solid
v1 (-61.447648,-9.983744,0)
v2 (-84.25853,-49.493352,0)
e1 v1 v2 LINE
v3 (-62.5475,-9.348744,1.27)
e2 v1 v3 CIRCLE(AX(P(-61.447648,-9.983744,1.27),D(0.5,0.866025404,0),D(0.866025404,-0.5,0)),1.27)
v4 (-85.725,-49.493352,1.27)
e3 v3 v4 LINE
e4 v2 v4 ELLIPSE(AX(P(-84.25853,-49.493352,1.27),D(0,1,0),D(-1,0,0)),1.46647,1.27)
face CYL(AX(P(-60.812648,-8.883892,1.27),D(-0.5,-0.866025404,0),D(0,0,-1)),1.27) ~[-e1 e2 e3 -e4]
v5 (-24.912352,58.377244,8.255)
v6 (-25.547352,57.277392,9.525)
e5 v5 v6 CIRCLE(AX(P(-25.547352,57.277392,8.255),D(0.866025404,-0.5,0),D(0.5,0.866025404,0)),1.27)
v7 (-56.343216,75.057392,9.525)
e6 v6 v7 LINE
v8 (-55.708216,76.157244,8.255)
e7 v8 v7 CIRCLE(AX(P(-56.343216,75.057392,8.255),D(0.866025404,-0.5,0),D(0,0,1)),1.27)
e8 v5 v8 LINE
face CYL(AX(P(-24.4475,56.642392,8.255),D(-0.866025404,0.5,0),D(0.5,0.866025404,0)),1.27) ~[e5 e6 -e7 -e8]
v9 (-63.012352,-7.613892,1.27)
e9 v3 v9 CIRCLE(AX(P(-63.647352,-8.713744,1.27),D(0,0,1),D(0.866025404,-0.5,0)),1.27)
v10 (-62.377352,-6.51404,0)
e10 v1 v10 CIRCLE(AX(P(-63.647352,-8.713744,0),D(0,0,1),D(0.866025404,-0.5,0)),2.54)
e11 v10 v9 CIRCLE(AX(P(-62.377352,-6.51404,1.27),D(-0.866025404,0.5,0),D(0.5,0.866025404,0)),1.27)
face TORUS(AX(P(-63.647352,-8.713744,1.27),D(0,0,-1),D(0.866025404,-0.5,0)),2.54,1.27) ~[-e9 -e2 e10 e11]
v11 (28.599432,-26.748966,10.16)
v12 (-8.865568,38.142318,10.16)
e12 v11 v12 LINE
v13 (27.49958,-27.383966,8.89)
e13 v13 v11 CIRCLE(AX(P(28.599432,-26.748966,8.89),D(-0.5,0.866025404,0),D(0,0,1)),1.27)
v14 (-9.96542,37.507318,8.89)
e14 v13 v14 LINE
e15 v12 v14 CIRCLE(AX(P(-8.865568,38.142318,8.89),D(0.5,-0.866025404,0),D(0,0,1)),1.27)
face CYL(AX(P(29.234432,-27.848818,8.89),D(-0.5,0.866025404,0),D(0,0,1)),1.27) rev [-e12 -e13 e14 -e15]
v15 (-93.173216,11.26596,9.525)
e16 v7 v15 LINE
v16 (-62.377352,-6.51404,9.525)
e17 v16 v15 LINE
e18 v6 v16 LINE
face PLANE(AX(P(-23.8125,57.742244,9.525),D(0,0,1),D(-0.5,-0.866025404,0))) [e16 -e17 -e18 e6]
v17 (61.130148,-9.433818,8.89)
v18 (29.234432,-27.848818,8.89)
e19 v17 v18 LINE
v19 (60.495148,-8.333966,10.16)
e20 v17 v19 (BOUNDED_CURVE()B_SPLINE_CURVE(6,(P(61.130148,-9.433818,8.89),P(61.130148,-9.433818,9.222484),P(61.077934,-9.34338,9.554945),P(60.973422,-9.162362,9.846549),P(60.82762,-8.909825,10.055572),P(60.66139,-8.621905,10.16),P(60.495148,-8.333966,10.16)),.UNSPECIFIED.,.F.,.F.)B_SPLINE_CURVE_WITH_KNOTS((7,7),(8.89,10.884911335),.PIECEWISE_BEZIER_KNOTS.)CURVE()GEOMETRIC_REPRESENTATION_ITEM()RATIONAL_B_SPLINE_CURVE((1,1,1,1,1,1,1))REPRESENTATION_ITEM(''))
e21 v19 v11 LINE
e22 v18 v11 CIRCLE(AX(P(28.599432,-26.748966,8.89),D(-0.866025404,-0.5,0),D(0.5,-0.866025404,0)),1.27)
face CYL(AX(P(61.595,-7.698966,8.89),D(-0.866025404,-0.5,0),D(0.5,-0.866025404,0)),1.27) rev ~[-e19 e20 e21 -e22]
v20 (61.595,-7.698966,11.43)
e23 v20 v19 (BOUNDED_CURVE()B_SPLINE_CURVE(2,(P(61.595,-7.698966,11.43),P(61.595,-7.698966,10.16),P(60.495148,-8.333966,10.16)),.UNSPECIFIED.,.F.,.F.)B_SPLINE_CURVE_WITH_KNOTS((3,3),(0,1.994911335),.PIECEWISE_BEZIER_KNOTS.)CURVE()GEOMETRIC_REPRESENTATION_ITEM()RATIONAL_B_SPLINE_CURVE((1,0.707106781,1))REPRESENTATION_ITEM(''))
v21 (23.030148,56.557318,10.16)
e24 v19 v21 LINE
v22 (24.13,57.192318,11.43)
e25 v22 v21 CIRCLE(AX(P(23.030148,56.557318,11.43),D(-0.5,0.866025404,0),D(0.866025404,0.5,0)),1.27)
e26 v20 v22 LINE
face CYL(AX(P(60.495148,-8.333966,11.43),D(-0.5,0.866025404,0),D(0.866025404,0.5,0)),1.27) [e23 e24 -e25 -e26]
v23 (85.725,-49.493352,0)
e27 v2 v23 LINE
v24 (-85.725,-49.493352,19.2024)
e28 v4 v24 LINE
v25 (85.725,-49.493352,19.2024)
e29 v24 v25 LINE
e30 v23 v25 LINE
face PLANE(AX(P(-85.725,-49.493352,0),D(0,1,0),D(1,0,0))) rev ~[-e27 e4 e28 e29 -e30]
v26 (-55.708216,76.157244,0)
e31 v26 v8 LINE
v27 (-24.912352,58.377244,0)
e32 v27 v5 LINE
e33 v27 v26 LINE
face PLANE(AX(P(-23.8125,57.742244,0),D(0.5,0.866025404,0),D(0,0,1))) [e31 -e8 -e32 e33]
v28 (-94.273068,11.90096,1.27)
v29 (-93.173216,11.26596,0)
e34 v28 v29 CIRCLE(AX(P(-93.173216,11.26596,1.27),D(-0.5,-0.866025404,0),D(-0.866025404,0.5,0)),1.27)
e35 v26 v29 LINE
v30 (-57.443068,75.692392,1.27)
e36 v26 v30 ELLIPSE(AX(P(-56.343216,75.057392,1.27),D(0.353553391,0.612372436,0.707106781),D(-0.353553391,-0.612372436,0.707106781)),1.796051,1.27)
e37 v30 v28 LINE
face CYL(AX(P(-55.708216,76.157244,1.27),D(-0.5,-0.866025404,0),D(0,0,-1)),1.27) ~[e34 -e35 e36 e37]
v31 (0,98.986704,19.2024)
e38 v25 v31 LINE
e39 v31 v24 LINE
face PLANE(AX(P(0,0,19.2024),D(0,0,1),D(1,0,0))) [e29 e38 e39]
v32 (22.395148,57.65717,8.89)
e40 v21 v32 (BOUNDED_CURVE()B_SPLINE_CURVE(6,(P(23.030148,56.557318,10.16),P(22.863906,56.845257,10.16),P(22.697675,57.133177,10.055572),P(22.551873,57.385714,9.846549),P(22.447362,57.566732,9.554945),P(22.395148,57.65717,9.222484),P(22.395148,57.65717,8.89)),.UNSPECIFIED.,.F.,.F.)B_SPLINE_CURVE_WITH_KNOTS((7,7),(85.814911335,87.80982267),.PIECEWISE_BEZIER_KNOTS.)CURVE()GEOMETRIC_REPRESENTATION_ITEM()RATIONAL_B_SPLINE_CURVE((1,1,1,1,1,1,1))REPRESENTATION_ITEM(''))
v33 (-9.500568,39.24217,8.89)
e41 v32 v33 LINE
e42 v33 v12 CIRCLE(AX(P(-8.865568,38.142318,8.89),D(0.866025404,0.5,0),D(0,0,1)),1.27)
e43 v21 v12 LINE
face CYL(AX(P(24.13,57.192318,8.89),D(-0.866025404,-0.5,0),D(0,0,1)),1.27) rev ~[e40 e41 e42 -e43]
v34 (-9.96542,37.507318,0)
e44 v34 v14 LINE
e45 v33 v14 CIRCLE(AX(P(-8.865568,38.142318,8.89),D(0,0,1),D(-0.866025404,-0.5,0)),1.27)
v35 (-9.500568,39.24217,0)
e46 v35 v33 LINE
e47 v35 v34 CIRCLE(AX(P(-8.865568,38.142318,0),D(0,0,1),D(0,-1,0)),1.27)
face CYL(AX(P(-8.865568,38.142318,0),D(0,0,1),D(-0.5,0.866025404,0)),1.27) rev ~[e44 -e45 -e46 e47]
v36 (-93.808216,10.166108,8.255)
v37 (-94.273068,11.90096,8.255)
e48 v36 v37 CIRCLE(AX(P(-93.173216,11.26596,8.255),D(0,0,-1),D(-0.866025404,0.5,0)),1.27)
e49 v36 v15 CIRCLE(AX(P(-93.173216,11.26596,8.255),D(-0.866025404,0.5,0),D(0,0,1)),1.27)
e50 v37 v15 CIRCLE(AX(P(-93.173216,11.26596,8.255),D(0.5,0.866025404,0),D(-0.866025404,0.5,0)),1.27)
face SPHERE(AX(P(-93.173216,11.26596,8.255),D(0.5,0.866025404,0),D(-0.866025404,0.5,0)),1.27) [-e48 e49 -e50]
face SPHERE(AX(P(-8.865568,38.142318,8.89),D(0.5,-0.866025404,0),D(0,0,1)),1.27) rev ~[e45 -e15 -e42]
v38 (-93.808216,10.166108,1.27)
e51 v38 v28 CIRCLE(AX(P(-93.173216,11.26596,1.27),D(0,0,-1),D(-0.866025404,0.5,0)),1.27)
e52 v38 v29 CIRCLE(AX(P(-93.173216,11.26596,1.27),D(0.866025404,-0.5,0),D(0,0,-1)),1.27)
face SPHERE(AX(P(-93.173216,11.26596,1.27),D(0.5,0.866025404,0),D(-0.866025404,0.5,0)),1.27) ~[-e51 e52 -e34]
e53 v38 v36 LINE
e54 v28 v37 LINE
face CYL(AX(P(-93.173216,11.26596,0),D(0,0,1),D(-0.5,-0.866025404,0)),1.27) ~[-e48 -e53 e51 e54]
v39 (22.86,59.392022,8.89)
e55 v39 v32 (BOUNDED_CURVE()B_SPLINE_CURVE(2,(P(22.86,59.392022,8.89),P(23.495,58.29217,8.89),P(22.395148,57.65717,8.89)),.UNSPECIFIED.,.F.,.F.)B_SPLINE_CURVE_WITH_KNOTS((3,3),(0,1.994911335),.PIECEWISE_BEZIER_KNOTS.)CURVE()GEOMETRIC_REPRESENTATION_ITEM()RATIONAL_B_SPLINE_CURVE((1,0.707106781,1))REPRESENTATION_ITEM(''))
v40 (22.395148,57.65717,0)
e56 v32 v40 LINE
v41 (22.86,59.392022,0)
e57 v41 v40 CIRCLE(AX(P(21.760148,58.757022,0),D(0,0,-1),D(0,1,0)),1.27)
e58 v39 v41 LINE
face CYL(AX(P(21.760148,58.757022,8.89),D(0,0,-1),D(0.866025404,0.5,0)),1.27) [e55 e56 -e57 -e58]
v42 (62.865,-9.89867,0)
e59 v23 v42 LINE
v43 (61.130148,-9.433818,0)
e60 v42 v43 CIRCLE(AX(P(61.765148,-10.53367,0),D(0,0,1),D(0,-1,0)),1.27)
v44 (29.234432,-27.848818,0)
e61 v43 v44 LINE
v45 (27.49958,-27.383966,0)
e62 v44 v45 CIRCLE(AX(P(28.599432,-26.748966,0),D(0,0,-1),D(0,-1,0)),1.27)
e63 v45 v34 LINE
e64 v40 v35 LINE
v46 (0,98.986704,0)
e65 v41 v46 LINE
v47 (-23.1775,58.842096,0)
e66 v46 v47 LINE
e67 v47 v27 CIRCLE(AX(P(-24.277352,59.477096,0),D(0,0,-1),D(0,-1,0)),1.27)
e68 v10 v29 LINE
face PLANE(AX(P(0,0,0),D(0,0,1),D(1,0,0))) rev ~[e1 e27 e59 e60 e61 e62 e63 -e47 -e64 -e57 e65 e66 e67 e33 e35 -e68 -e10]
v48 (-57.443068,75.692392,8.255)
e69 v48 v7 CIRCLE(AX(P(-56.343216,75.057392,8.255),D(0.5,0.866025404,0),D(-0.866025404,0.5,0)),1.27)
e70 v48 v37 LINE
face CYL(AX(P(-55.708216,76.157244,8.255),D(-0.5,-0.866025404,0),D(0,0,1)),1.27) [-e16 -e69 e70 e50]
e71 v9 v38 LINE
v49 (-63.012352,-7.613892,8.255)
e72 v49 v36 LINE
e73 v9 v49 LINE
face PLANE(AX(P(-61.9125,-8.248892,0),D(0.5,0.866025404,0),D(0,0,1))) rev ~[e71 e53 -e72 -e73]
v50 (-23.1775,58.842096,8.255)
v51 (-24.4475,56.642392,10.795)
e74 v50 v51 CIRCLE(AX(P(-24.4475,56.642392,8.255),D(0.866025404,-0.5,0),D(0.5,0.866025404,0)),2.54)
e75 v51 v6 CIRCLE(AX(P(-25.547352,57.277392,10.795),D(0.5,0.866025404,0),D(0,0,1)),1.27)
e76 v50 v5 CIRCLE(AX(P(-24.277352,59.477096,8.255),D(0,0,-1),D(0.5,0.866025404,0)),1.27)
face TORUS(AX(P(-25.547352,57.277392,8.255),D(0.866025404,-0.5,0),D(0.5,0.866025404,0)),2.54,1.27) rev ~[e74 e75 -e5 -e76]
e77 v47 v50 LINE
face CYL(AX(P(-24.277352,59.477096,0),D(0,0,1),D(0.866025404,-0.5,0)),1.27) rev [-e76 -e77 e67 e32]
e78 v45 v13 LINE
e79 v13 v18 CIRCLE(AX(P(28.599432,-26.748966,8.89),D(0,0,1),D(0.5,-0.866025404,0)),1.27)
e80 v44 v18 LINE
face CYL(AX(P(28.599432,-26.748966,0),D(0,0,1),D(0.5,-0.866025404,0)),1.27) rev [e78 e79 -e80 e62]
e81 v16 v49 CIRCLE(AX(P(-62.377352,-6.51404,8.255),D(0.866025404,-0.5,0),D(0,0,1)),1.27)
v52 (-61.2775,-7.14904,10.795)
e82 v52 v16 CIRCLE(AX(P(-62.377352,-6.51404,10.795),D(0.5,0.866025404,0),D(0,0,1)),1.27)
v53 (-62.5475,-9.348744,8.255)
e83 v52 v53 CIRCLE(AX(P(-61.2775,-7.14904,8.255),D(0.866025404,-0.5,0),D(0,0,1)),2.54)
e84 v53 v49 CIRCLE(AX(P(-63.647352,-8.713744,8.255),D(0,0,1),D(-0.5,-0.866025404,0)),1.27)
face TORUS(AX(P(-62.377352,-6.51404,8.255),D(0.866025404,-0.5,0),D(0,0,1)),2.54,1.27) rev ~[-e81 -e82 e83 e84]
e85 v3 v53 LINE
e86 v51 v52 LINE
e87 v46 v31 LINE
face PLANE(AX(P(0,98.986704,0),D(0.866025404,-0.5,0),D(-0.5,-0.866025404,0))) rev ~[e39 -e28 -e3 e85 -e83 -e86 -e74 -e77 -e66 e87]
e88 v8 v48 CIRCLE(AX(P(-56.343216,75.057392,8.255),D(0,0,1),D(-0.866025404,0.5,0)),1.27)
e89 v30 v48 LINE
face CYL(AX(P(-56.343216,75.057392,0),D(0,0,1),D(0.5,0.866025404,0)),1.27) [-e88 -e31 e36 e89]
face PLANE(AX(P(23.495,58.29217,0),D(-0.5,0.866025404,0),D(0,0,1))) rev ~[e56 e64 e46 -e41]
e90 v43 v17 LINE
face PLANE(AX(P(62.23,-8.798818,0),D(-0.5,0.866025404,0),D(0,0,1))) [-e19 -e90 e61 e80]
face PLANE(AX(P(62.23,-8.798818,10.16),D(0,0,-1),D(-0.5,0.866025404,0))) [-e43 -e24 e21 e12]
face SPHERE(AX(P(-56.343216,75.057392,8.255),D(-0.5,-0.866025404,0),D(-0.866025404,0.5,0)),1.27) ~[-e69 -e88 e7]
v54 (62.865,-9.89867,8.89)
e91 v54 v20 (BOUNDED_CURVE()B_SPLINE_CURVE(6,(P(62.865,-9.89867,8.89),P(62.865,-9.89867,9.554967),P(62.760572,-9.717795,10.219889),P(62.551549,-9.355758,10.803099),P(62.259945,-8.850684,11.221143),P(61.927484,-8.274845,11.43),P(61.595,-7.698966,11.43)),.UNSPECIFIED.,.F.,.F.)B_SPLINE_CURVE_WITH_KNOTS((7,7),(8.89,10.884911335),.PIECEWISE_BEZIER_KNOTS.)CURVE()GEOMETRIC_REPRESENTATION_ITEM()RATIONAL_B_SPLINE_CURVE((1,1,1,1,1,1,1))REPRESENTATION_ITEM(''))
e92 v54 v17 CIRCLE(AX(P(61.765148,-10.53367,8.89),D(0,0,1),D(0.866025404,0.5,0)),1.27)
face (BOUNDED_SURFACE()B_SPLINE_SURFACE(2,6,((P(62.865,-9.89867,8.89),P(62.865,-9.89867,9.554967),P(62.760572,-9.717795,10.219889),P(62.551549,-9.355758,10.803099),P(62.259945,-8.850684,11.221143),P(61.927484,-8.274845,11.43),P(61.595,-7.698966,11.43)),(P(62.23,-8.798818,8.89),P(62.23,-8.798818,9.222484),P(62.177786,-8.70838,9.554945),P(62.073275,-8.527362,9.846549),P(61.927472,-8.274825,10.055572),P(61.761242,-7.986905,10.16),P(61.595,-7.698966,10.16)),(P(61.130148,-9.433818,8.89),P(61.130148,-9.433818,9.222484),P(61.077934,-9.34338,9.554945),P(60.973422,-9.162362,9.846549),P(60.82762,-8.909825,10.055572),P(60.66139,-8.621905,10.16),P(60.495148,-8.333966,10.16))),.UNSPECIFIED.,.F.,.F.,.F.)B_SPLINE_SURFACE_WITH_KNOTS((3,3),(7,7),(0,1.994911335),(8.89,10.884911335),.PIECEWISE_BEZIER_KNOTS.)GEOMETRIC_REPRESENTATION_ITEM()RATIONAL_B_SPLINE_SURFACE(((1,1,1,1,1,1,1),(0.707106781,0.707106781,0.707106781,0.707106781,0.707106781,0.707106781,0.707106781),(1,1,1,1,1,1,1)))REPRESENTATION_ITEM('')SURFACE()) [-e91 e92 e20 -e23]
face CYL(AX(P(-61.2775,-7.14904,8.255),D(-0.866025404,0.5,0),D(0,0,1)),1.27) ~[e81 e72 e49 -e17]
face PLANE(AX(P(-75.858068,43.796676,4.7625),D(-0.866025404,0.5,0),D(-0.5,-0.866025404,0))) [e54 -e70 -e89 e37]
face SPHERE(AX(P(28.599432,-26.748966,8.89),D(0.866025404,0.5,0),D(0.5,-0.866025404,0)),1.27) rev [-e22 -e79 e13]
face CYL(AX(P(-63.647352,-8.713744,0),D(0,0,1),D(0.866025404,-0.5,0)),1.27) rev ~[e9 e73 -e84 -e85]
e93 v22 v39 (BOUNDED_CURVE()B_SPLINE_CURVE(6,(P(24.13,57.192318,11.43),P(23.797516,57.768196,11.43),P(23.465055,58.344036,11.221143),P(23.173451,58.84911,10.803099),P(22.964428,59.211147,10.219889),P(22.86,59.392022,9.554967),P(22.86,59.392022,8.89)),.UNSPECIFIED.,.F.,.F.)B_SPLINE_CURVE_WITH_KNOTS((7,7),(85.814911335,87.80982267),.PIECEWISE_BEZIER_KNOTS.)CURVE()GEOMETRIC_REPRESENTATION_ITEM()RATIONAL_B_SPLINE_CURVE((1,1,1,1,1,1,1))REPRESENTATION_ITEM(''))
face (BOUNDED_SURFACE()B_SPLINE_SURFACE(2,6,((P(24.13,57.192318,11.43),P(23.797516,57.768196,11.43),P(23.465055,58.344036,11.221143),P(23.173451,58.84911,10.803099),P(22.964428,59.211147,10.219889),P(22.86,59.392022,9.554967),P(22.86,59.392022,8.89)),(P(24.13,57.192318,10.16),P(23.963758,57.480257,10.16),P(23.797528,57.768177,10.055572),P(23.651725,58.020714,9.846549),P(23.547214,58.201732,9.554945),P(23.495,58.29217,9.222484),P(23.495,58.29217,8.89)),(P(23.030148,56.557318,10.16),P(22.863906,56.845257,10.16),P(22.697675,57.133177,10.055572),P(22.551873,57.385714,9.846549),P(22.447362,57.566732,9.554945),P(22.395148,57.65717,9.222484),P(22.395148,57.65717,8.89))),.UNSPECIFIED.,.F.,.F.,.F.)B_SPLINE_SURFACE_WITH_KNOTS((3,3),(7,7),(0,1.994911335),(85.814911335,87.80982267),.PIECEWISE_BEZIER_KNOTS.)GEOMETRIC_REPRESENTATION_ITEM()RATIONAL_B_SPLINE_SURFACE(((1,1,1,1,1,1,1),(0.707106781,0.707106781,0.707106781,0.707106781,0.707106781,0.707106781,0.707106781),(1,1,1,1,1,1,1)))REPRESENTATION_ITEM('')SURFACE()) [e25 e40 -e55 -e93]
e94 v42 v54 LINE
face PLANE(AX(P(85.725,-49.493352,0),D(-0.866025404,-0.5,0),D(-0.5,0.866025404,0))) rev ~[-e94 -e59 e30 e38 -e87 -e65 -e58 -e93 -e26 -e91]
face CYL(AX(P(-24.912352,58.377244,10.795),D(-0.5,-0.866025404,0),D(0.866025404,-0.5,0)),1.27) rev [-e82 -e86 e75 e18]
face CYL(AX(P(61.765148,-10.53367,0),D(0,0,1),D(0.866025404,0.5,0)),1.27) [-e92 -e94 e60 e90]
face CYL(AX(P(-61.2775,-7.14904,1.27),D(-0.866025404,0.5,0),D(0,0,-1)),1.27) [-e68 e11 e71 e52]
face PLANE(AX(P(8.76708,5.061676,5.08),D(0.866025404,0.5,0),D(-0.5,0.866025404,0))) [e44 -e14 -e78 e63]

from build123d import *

# Parameters (mm, degrees)
F1_DEPTH = 19.2024
F2_W     = 77.47
F2_H     = 10.16
F3_DEPTH = 39.37
F4_F1_R  = 1.27
F4_F2_R  = 1.27
F5_W     = 76.2
F5_H     = 9.525
F6_DEPTH = 38.1
F7_R     = 1.27


with BuildPart() as f1:
    # F0 (on Top) → F1 (new body)
    with BuildSketch(Plane.XY):
        Polygon((-85.725, -49.4933518263), (85.725, -49.4933518263), (0, 98.9867036526), align=None)
    extrude(amount=F1_DEPTH)

    # F2 (on face) → F3 (cut)
    with BuildSketch(Plane(origin=(42.8625, 24.7466759131, 0), x_dir=(-0.5, 0.8660254038, 0), z_dir=(0.8660254038, 0.5, 0))):
        with Locations((0, 5.08)):
            Rectangle(F2_W, F2_H)
    extrude(amount=-F3_DEPTH, mode=Mode.SUBTRACT)

    # F4: fillet of radius 1.27 on 6 edges, made by hand

    # F4_f1
    f4_f1_edges = [f1.edges().sort_by_distance(p)[0] for p in [
        (45.1822899265, -18.6413181024, 10.16),
        (28.134579853, -28.4838181024, 5.08),
        (8.767079853, 5.0616759131, 10.16),
        (6.4472899265, 48.4496699287, 10.16),
        (-10.600420147, 38.6071699287, 5.08),
    ]]
    fillet(f4_f1_edges, radius=F4_F1_R)

    # F4_f2
    f4_f2_edges = [f1.edges().sort_by_distance(p)[0] for p in [
        (62.23, -8.7988181024, 4.445),
        (62.0440128061, -8.476678833, 9.7880256121),
    ]]
    fillet(f4_f2_edges, radius=F4_F2_R)

    # F5 (on face) → F6 (join)
    with BuildSketch(Plane(origin=(-42.8625, 24.7466759131, 0), x_dir=(-0.5, -0.8660254038, 0), z_dir=(-0.8660254038, 0.5, 0))):
        with Locations((0, 4.7625)):
            Rectangle(F5_W, F5_H)
    extrude(amount=F6_DEPTH)

    # F7
    f7_edges = [f1.edges().sort_by_distance(p)[0] for p in [
        (-75.858068, 43.796676, 9.525),
        (-56.808068, 76.792244, 4.7625),
        (-75.858068, 43.796676, 0),
        (-94.908068, 10.801108, 4.7625),
        (-40.310284, 67.267244, 9.525),
        (-78.410284, 1.276108, 0),
        (-23.8125, 57.742244, 4.7625),
        (-61.9125, -8.248892, 4.7625),
        (-78.410284, 1.276108, 9.525),
        (-73.81875, -28.871122, 0),
        (-42.8625, 24.746676, 9.525),
    ]]
    fillet(f7_edges, radius=F7_R)


solid = f1.part
